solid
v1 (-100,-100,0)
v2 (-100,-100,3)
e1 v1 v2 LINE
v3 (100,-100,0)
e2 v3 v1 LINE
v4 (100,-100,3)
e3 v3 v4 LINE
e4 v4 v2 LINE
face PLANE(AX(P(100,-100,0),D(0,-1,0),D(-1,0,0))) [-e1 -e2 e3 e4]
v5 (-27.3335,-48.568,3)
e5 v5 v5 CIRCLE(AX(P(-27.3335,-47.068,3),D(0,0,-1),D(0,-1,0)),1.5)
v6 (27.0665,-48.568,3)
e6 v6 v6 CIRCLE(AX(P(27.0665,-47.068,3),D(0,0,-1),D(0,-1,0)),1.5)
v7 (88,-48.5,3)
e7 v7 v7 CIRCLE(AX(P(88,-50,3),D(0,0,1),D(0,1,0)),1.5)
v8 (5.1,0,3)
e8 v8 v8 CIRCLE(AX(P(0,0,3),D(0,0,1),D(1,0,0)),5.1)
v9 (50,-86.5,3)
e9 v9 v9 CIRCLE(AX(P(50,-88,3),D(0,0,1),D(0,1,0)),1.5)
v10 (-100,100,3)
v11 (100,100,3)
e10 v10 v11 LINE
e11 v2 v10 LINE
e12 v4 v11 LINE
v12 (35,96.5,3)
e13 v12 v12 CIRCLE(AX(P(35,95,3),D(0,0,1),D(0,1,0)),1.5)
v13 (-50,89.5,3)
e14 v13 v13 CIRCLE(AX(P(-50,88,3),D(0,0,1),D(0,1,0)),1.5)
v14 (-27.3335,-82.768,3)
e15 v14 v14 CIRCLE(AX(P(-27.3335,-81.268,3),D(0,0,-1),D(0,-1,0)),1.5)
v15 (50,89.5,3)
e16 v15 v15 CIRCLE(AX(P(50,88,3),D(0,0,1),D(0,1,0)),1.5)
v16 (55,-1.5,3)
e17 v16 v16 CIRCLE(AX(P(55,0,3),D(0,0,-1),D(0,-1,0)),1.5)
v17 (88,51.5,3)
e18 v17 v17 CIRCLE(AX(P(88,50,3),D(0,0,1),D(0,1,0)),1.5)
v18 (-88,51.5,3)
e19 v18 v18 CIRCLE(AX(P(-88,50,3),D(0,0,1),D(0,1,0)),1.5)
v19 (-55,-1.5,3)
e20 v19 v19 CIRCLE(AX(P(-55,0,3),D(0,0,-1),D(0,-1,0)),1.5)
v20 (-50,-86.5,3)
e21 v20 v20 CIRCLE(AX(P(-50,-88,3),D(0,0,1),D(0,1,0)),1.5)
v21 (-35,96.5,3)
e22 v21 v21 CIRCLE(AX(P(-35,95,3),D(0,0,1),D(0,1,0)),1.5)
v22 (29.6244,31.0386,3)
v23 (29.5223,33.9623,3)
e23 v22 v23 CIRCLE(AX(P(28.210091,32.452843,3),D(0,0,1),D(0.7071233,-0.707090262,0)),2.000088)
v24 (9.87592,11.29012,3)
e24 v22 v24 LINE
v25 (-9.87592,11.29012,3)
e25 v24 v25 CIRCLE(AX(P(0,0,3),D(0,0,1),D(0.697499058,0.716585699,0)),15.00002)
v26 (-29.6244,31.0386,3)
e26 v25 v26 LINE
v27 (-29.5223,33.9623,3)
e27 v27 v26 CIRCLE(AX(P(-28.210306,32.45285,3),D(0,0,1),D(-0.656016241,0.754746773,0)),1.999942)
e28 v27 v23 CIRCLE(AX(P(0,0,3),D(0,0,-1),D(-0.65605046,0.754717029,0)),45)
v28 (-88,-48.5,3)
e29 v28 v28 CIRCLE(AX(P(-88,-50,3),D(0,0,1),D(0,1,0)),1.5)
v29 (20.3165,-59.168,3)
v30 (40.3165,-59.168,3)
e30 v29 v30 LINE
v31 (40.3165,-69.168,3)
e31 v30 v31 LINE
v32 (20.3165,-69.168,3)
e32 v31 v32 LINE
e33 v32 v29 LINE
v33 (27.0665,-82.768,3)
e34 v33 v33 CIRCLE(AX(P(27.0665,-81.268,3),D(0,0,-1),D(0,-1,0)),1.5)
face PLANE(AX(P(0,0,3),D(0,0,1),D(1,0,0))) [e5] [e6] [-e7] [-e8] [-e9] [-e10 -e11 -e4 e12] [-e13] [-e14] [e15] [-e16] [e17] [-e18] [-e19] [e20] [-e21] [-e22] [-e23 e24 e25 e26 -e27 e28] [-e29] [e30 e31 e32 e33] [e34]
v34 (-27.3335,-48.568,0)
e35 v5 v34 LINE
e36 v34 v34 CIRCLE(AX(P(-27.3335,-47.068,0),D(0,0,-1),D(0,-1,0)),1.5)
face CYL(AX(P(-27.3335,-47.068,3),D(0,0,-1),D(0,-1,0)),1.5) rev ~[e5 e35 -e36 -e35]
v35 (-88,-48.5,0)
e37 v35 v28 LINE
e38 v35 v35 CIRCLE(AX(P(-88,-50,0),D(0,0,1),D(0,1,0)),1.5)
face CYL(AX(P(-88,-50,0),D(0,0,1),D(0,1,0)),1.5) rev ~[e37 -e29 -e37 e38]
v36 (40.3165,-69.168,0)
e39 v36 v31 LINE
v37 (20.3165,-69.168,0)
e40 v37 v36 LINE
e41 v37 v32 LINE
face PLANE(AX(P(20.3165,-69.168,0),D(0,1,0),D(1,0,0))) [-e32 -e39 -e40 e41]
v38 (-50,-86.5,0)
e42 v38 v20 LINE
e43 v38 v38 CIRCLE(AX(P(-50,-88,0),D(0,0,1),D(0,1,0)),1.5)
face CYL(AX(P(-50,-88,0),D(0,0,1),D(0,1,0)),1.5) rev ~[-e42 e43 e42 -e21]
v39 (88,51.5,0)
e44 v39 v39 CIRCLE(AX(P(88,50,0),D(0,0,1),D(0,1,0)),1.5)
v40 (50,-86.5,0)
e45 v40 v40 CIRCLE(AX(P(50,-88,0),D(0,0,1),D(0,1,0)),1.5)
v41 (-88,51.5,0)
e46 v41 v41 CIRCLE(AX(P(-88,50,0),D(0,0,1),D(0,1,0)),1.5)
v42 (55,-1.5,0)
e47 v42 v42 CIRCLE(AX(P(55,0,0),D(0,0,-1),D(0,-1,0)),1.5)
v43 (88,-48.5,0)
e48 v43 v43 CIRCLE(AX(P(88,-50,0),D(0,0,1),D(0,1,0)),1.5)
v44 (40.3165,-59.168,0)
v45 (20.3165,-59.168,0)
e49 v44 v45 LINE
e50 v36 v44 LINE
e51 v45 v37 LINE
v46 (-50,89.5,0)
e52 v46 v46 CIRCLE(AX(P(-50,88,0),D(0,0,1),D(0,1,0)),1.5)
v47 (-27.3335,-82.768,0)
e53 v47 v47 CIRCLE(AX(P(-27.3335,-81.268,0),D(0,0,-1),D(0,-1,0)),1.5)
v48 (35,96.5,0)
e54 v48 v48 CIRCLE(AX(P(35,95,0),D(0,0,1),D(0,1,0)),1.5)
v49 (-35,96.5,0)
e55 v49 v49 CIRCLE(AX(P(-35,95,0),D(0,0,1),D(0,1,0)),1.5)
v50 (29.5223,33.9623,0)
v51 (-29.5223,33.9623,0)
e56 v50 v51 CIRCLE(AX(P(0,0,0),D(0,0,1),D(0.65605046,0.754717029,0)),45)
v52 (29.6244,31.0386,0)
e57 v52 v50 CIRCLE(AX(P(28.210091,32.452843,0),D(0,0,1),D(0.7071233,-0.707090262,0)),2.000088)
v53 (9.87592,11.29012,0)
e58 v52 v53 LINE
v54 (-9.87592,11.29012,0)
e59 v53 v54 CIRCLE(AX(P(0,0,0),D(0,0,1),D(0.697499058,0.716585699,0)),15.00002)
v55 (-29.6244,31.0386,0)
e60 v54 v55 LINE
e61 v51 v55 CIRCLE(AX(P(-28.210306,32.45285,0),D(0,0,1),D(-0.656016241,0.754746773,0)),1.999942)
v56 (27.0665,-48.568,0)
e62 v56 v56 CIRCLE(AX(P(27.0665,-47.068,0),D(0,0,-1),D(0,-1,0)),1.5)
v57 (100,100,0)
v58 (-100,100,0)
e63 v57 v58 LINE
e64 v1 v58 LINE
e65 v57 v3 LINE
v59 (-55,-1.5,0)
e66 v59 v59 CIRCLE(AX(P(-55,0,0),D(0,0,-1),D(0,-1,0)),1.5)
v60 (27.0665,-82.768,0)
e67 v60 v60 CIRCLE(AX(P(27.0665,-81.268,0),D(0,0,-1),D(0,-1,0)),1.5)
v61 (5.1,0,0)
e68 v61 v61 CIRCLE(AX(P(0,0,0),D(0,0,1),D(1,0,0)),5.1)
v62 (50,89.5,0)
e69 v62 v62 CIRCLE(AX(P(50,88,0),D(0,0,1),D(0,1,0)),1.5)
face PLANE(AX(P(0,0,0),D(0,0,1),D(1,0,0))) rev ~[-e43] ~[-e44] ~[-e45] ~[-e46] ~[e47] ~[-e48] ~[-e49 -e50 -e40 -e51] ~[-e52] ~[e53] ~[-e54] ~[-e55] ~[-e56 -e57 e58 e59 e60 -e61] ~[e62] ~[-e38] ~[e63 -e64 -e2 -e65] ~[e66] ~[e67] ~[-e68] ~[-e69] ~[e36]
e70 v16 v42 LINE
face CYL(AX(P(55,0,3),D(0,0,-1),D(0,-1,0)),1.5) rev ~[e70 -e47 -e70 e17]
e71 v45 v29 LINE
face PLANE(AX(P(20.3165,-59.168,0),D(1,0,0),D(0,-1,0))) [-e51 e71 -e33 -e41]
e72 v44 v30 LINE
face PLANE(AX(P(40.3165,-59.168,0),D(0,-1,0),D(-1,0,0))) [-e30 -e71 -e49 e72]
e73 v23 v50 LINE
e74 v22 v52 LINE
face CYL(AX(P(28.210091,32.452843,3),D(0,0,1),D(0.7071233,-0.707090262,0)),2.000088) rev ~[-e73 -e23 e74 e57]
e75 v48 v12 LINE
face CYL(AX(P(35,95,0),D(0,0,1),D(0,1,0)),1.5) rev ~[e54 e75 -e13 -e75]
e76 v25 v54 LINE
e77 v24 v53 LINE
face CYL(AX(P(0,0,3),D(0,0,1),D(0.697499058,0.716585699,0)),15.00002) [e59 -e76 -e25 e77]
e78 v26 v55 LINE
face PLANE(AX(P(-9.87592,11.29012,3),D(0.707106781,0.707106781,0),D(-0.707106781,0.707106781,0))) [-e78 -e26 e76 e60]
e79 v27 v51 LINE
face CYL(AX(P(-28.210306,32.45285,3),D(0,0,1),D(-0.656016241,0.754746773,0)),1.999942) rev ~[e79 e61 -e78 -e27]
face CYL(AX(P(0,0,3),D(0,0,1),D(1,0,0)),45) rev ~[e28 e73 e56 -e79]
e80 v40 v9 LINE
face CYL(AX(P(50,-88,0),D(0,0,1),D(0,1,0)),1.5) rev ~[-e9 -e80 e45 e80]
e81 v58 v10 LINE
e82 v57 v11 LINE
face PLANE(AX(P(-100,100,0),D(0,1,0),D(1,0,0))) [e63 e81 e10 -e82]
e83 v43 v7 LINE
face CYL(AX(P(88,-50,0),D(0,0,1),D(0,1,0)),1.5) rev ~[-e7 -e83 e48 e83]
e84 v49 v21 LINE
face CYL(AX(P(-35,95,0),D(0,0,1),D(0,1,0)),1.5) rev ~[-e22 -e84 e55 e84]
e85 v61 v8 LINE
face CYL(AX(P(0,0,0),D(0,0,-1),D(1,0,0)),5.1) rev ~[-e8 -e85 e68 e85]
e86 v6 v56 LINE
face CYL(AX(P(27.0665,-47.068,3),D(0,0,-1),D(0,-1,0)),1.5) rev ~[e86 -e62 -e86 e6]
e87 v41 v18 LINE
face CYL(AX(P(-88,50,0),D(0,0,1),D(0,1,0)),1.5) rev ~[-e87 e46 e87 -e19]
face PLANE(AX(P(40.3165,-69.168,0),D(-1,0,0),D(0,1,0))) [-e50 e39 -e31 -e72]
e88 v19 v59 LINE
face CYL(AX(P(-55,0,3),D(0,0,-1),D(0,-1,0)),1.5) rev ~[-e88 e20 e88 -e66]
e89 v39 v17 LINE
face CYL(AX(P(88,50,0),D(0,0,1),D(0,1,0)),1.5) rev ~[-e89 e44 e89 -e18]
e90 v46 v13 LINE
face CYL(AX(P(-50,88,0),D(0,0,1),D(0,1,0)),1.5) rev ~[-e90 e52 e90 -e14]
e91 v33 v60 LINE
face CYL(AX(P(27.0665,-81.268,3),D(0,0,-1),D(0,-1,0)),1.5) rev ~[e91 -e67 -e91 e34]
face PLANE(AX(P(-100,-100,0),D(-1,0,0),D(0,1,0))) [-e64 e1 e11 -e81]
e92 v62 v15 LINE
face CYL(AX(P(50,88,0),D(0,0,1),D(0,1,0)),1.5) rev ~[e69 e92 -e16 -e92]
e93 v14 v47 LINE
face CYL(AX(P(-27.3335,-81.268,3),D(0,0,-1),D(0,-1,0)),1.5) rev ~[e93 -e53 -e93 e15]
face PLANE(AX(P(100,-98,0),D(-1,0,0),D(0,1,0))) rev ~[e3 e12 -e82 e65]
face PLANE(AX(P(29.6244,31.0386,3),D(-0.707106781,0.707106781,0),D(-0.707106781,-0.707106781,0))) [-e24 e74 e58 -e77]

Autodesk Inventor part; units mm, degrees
ref_plane "YZ Plane" through (0, 0, 0) normal (1, 0, 0) x (0, 1, 0)
ref_plane "XZ Plane" through (0, 0, 0) normal (0, 1, 0) x (-1, 0, 0)
ref_plane "XY Plane" through (0, 0, 0) normal (0, 0, 1) x (1, 0, 0)
sketch "Boceto1" plane through (0, 0, 0) normal (0, 0, 1) x (1, 0, 0)
  line L0 (-103, 100) -> (-103, -103)
  line L1 (-103, 100) -> (-100, 100)
  line L2 (-100, -103) -> (-100, 100)
  line L3 (-103, -103) -> (-100, -103)
  line L4 (100, 103) -> (-103, 103)
  line L5 (100, 103) -> (100, 100)
  line L6 (-103, 100) -> (100, 100)
  line L7 (-103, 103) -> (-103, 100)
  line L8 (-100, -103) -> (103, -103)
  line L9 (-100, -103) -> (-100, -100)
  line L10 (103, -100) -> (-100, -100)
  line L11 (103, -103) -> (103, -100)
  line L12 (100, -98) -> (100, 100)
  line L13 (100, 100) -> (98, 100)
  circle A0 centre (0, 0) radius 3.9
  circle A1 centre (0, 0) radius 8
  circle A2 centre (0, 0) radius 3.9
  circle A3 centre (0, 0) radius 4
  line L14 (103, 100) -> (103, -103)
  line L15 (100, -103) -> (100, 100)
  line L16 (103, -103) -> (100, -103)
  circle A4 centre (0, 0) radius 5.1
  line L17 (103, 100) -> (100, 100)
  point P0 (100, -100)
extrude "Extrusión1" add sketch "Boceto1" along normal blind 3 contours L6 L12 L15 L10 L2 | A1
sketch "Boceto2" plane through (0, 0, 3) normal (0, 0, 1) x (1, 0, 0)
  circle A0 centre (0, 0) radius 45
  line L0 (-4.4142, 5.8284) -> (-29.6244, 31.0386)
  arc A1 (-3.1395, 44.8903) -> (-29.5223, 33.9623) centre (0, 0) ccw
  line L1 (29.6244, 31.0386) -> (4.4142, 5.8284)
  arc A2 (29.5223, 33.9623) -> (3.1395, 44.8903) centre (0, 0) ccw
  arc A3 (-29.5223, 33.9623) -> (-29.6244, 31.0386) centre (-28.2102, 32.4528) ccw
  arc A4 (29.6244, 31.0386) -> (29.5223, 33.9623) centre (28.2102, 32.4528) ccw
  circle A5 centre (0, 0) radius 8
  circle A6 centre (0, 0) radius 8
  arc A7 (10.4625, 10.7488) -> (-10.4625, 10.7488) centre (0, 0) ccw projected
  point P0 (36.7643, -25.9497)
  point P1 (-36.7643, -25.9497)
  point P2 (-4.9054, 6.3196)
  point P3 (4.9054, 6.3196)
  point P4 (-9.8759, 11.2901)
  point P5 (9.8759, 11.2901)
extrude "Extrusión2" cut sketch "Boceto2" against normal blind 3 contours A4 L1 A7 L0 A3 A0
sketch "Boceto4" plane through (0, 0, 3) normal (0, 0, 1) x (1, 0, 0)
  circle A0 centre (0, 0) radius 55
  circle A1 centre (0, 0) radius 5.1 projected
  line L0 (0, 0) -> (55, 0)
  circle A2 centre (55, 0) radius 1.5
  circle A3 centre (-55, 0) radius 1.5
  dimension "d14" = 55
  dimension "d15" = 3
  dimension "d16" = 3
hole "Agujero2" at (55, 0, 3) at (-55, 0, 3) direction (0, 0, -1) diameter 3 depth 4
sketch "Boceto5" plane through (0, 0, 0) normal (0, 0, -1) x (-1, 0, 0)
  circle A0 centre (88, -50) radius 2.1 projected
  circle A1 centre (50, -88) radius 2.1 projected
  circle A2 centre (-50, -88) radius 2.1 projected
  circle A3 centre (-88, -50) radius 2.1 projected
  circle A4 centre (-88, 50) radius 2.1 projected
  circle A5 centre (-50, 88) radius 2.1 projected
  circle A6 centre (50, 88) radius 2.1 projected
  circle A7 centre (88, 50) radius 2.1 projected
  point P0 (0, 0)
hole "Agujero3" at (-88, -50, 0) at (-88, 50, 0) at (-50, 88, 0) at (50, 88, 0) at (88, 50, 0) at (88, -50, 0) at (50, -88, 0) at (-50, -88, 0) direction (0, 0, 1) diameter 3 depth 4
sketch "Boceto6" plane through (0, 0, 3) normal (0, 0, 1) x (1, 0, 0)
  line L0 (20.3165, -69.168) -> (31.0665, -69.168) projected
  line L1 (20.3165, -74.518) -> (20.3165, -69.168) projected
  line L2 (-20.5835, -74.518) -> (20.3165, -74.518) projected
  line L3 (-20.5835, -53.818) -> (-20.5835, -74.518) projected
  line L4 (20.3165, -53.818) -> (-20.5835, -53.818) projected
  line L5 (20.3165, -59.168) -> (20.3165, -53.818) projected
  line L6 (31.0665, -59.168) -> (20.3165, -59.168) projected
  line L7 (31.0665, -43.068) -> (31.0665, -59.168) projected
  line L8 (23.0665, -43.068) -> (31.0665, -43.068) projected
  line L9 (-15.3335, -51.068) -> (15.0665, -51.068) projected
  line L10 (-31.3335, -43.068) -> (-23.3335, -43.068) projected
  line L11 (-31.3335, -85.268) -> (-31.3335, -43.068) projected
  line L12 (-23.3335, -85.268) -> (-31.3335, -85.268) projected
  line L13 (15.0665, -77.268) -> (-15.3335, -77.268) projected
  line L14 (31.0665, -85.268) -> (23.0665, -85.268) projected
  line L15 (31.0665, -69.168) -> (31.0665, -85.268) projected
  circle A0 centre (27.0665, -81.268) radius 2.1 projected
  circle A1 centre (-27.3335, -81.268) radius 2.1 projected
  circle A2 centre (27.0665, -47.068) radius 2.1 projected
  circle A3 centre (-27.3335, -47.068) radius 2.1 projected
  arc A4 (15.0665, -51.068) -> (23.0665, -43.068) centre (15.0665, -43.068) ccw projected
  arc A5 (-23.3335, -43.068) -> (-15.3335, -51.068) centre (-15.3335, -43.068) ccw projected
  arc A6 (-15.3335, -77.268) -> (-23.3335, -85.268) centre (-15.3335, -85.268) ccw projected
  arc A7 (23.0665, -85.268) -> (15.0665, -77.268) centre (15.0665, -85.268) ccw projected
  point P0 (0, 0)
hole "Agujero4" at (27.0665, -81.268, 3) at (27.0665, -47.068, 3) at (-27.3335, -47.068, 3) at (-27.3335, -81.268, 3) direction (0, 0, -1) diameter 3 depth 15
sketch "Boceto7" plane through (0, 0, 0) normal (0, 0, -1) x (-1, 0, 0)
  circle A0 centre (35, 95) radius 2.1 projected
  circle A1 centre (-35, 95) radius 2.1 projected
  circle A2 centre (35, 95) radius 1.5
  point P0 (0, 0)
  dimension "d38" = 3
hole "Agujero5" at (-35, 95, 0) at (35, 95, 0) direction (0, 0, 1) diameter 3 depth 15
sketch "Boceto8" plane through (0, 0, 0) normal (0, 0, -1) x (-1, 0, 0)
  arc A0 (-15.0665, -77.268) -> (-23.0665, -85.268) centre (-15.0665, -85.268) ccw projected
  line L0 (-31.0665, -85.268) -> (-23.0665, -85.268) projected
  line L1 (-31.0665, -69.168) -> (-31.0665, -85.268) projected
  line L2 (-31.0665, -43.068) -> (-31.0665, -59.168) projected
  line L3 (-31.0665, -59.168) -> (-20.3165, -59.168) projected
  line L4 (-20.3165, -69.168) -> (-31.0665, -69.168) projected
  line L5 (-20.0665, -54.068) -> (-20.0665, -74.268) projected
  line L6 (-23.0665, -43.068) -> (-31.0665, -43.068) projected
  line L7 (-20.3165, -69.168) -> (-40.3165, -69.168)
  line L8 (-40.3165, -69.168) -> (-40.3165, -59.168)
  line L9 (-40.3165, -59.168) -> (-20.3165, -59.168)
  line L10 (-20.3165, -59.168) -> (-20.3165, -69.168)
  point P0 (0, 0)
  dimension "d46" = 20
  dimension "d47" = 10
extrude "Extrusión3" cut sketch "Boceto8" against normal blind 10
properties part number "Soporte_Dosificador"
